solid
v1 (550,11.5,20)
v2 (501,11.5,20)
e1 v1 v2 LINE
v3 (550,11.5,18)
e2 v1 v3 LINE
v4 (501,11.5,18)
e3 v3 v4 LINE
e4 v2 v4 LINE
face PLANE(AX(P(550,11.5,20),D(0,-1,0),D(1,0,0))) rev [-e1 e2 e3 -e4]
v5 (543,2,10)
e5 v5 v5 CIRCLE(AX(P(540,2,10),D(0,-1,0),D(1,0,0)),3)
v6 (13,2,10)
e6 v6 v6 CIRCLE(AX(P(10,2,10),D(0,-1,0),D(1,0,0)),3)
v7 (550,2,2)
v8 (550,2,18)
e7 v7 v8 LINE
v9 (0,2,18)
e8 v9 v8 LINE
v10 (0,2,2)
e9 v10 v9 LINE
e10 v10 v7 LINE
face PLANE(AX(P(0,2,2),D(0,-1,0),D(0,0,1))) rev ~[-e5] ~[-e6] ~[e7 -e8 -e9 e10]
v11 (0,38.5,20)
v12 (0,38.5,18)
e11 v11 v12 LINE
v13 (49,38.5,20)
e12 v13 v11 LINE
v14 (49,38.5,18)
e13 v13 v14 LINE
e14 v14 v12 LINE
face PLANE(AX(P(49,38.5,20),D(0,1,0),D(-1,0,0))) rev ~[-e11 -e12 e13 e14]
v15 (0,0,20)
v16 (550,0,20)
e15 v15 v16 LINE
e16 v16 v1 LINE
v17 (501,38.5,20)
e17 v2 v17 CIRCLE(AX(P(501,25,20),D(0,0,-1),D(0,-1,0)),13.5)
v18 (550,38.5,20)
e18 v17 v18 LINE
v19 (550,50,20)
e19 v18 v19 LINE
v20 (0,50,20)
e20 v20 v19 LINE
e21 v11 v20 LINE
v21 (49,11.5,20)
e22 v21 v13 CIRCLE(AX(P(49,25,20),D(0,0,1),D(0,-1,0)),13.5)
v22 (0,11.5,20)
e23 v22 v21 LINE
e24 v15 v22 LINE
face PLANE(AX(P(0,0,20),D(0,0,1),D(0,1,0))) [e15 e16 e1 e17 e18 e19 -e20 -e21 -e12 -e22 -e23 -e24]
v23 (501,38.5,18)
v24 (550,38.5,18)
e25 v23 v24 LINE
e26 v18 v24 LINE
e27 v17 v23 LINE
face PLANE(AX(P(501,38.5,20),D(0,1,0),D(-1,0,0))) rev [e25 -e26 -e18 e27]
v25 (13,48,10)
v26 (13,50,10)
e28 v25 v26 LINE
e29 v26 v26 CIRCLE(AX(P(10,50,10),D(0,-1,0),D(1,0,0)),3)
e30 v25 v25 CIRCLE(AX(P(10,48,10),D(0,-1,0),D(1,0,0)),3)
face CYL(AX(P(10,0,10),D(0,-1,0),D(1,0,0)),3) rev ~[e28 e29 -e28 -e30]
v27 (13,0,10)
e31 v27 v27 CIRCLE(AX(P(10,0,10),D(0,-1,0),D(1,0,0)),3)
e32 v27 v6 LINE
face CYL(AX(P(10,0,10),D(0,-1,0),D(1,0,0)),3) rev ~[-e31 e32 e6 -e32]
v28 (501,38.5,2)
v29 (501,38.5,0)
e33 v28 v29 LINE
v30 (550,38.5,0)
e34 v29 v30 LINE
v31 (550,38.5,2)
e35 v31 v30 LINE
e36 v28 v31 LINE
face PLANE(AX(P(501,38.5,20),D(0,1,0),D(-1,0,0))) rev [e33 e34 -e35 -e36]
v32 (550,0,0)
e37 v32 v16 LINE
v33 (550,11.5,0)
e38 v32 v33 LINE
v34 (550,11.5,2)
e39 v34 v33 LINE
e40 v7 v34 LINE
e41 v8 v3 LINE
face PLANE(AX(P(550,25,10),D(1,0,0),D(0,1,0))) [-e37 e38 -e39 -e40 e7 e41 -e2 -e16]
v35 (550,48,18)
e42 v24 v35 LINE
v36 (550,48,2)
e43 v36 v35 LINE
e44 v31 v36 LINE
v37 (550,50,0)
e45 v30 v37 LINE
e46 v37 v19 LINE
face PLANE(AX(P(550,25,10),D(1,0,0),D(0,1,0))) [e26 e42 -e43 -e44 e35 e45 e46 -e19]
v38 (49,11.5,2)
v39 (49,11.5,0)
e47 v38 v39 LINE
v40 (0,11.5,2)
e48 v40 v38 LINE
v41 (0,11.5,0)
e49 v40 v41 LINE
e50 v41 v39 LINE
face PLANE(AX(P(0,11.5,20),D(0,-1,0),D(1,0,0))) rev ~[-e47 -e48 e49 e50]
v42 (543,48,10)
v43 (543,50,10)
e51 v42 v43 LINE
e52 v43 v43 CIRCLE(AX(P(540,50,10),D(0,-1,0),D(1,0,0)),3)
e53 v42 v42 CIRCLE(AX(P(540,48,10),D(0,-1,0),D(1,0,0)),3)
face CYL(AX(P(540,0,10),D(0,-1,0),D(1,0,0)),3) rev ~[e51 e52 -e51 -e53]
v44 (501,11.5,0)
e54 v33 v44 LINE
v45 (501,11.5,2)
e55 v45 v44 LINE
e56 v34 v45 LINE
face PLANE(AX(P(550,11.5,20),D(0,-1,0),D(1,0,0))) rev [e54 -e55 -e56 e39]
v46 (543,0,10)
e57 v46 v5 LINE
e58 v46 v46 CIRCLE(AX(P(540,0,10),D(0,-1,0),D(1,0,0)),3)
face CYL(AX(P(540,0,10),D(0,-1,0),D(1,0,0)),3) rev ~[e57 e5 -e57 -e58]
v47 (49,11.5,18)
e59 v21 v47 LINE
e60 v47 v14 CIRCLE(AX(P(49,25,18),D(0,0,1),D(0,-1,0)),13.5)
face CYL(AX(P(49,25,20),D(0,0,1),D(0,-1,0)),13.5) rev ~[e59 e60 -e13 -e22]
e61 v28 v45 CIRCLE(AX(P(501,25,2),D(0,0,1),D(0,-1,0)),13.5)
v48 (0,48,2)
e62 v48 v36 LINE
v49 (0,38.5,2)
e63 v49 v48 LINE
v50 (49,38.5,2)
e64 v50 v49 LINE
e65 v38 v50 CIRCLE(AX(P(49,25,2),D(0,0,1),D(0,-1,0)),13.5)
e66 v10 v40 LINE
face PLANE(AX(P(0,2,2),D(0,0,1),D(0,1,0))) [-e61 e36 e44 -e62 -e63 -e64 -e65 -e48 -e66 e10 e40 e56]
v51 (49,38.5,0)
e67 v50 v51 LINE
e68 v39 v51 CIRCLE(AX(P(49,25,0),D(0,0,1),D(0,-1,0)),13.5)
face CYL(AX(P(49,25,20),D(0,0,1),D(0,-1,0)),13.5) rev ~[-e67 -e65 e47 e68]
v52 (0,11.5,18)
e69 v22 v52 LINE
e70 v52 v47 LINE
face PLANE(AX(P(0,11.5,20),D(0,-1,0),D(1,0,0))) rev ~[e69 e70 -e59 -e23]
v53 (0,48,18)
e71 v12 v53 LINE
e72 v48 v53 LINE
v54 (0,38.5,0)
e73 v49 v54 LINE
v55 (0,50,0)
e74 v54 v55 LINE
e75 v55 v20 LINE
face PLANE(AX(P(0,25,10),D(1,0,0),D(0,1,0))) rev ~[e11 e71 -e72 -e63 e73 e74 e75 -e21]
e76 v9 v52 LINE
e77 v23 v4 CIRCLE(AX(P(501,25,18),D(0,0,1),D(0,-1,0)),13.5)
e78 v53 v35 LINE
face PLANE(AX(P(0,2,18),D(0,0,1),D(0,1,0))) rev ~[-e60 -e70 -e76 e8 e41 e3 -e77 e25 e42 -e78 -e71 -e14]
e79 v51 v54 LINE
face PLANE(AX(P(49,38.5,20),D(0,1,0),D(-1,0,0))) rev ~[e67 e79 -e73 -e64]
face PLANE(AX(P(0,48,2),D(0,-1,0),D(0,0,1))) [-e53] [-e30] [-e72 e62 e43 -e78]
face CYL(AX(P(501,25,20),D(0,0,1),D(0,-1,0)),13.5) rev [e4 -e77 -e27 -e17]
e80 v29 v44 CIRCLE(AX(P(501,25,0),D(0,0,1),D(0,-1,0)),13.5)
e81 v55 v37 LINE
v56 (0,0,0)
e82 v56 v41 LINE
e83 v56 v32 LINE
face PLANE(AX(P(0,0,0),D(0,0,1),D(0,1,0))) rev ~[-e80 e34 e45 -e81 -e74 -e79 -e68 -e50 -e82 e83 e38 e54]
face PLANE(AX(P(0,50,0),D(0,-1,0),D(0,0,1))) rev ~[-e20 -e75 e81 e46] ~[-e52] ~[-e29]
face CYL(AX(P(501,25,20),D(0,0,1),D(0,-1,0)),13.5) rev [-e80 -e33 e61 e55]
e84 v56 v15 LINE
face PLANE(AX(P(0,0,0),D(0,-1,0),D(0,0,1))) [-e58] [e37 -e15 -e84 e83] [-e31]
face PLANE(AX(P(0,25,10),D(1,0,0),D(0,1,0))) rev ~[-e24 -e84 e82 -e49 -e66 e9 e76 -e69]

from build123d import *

# Parameters (mm, degrees)
F0_W     = 50
F0_H     = 20
F0_W_2   = 46
F0_H_2   = 16
F1_DEPTH = 550
F2_R     = 3
F3_DEPTH = 50.001
F5_DEPTH = 20.001


# Not quite as in the source:
# - a pattern or mirror of a feature is missing from the dataset's text; its kind, count and spacing are read off the source's solid


with BuildPart() as f1:
    # F0 (on Right) → F1 (new body)
    with BuildSketch(Plane.YZ):
        with Locations((25, 10)):
            Rectangle(F0_W, F0_H)
        with Locations((25, 10)):
            Rectangle(F0_W_2, F0_H_2, mode=Mode.SUBTRACT)
    extrude(amount=F1_DEPTH)

    # F2 (on face) → F3 (cut, through all)
    with BuildSketch(Plane.XZ):
        with Locations((10, 10)):
            Circle(F2_R)
        with Locations((540, 10)):
            Circle(F2_R)
    extrude(amount=-F3_DEPTH, mode=Mode.SUBTRACT)

    # F4 (on face) → F5 (cut, through all)
    with BuildSketch(Plane.XY.offset(20)):
        with BuildLine():
            Line((0, 11.5), (49, 11.5))
            ThreePointArc((49, 11.5), (62.5, 25), (49, 38.5))
            Line((49, 38.5), (0, 38.5))
            Line((0, 38.5), (0, 11.5))
        make_face()
    f5 = extrude(amount=-F5_DEPTH, mode=Mode.SUBTRACT)

    # F5_copies: F5 across plane
    add(f5.mirror(Plane(origin=(275, 0, 0), x_dir=(0, 0, 1), z_dir=(1, 0, 0))), mode=Mode.SUBTRACT)


solid = f1.part
